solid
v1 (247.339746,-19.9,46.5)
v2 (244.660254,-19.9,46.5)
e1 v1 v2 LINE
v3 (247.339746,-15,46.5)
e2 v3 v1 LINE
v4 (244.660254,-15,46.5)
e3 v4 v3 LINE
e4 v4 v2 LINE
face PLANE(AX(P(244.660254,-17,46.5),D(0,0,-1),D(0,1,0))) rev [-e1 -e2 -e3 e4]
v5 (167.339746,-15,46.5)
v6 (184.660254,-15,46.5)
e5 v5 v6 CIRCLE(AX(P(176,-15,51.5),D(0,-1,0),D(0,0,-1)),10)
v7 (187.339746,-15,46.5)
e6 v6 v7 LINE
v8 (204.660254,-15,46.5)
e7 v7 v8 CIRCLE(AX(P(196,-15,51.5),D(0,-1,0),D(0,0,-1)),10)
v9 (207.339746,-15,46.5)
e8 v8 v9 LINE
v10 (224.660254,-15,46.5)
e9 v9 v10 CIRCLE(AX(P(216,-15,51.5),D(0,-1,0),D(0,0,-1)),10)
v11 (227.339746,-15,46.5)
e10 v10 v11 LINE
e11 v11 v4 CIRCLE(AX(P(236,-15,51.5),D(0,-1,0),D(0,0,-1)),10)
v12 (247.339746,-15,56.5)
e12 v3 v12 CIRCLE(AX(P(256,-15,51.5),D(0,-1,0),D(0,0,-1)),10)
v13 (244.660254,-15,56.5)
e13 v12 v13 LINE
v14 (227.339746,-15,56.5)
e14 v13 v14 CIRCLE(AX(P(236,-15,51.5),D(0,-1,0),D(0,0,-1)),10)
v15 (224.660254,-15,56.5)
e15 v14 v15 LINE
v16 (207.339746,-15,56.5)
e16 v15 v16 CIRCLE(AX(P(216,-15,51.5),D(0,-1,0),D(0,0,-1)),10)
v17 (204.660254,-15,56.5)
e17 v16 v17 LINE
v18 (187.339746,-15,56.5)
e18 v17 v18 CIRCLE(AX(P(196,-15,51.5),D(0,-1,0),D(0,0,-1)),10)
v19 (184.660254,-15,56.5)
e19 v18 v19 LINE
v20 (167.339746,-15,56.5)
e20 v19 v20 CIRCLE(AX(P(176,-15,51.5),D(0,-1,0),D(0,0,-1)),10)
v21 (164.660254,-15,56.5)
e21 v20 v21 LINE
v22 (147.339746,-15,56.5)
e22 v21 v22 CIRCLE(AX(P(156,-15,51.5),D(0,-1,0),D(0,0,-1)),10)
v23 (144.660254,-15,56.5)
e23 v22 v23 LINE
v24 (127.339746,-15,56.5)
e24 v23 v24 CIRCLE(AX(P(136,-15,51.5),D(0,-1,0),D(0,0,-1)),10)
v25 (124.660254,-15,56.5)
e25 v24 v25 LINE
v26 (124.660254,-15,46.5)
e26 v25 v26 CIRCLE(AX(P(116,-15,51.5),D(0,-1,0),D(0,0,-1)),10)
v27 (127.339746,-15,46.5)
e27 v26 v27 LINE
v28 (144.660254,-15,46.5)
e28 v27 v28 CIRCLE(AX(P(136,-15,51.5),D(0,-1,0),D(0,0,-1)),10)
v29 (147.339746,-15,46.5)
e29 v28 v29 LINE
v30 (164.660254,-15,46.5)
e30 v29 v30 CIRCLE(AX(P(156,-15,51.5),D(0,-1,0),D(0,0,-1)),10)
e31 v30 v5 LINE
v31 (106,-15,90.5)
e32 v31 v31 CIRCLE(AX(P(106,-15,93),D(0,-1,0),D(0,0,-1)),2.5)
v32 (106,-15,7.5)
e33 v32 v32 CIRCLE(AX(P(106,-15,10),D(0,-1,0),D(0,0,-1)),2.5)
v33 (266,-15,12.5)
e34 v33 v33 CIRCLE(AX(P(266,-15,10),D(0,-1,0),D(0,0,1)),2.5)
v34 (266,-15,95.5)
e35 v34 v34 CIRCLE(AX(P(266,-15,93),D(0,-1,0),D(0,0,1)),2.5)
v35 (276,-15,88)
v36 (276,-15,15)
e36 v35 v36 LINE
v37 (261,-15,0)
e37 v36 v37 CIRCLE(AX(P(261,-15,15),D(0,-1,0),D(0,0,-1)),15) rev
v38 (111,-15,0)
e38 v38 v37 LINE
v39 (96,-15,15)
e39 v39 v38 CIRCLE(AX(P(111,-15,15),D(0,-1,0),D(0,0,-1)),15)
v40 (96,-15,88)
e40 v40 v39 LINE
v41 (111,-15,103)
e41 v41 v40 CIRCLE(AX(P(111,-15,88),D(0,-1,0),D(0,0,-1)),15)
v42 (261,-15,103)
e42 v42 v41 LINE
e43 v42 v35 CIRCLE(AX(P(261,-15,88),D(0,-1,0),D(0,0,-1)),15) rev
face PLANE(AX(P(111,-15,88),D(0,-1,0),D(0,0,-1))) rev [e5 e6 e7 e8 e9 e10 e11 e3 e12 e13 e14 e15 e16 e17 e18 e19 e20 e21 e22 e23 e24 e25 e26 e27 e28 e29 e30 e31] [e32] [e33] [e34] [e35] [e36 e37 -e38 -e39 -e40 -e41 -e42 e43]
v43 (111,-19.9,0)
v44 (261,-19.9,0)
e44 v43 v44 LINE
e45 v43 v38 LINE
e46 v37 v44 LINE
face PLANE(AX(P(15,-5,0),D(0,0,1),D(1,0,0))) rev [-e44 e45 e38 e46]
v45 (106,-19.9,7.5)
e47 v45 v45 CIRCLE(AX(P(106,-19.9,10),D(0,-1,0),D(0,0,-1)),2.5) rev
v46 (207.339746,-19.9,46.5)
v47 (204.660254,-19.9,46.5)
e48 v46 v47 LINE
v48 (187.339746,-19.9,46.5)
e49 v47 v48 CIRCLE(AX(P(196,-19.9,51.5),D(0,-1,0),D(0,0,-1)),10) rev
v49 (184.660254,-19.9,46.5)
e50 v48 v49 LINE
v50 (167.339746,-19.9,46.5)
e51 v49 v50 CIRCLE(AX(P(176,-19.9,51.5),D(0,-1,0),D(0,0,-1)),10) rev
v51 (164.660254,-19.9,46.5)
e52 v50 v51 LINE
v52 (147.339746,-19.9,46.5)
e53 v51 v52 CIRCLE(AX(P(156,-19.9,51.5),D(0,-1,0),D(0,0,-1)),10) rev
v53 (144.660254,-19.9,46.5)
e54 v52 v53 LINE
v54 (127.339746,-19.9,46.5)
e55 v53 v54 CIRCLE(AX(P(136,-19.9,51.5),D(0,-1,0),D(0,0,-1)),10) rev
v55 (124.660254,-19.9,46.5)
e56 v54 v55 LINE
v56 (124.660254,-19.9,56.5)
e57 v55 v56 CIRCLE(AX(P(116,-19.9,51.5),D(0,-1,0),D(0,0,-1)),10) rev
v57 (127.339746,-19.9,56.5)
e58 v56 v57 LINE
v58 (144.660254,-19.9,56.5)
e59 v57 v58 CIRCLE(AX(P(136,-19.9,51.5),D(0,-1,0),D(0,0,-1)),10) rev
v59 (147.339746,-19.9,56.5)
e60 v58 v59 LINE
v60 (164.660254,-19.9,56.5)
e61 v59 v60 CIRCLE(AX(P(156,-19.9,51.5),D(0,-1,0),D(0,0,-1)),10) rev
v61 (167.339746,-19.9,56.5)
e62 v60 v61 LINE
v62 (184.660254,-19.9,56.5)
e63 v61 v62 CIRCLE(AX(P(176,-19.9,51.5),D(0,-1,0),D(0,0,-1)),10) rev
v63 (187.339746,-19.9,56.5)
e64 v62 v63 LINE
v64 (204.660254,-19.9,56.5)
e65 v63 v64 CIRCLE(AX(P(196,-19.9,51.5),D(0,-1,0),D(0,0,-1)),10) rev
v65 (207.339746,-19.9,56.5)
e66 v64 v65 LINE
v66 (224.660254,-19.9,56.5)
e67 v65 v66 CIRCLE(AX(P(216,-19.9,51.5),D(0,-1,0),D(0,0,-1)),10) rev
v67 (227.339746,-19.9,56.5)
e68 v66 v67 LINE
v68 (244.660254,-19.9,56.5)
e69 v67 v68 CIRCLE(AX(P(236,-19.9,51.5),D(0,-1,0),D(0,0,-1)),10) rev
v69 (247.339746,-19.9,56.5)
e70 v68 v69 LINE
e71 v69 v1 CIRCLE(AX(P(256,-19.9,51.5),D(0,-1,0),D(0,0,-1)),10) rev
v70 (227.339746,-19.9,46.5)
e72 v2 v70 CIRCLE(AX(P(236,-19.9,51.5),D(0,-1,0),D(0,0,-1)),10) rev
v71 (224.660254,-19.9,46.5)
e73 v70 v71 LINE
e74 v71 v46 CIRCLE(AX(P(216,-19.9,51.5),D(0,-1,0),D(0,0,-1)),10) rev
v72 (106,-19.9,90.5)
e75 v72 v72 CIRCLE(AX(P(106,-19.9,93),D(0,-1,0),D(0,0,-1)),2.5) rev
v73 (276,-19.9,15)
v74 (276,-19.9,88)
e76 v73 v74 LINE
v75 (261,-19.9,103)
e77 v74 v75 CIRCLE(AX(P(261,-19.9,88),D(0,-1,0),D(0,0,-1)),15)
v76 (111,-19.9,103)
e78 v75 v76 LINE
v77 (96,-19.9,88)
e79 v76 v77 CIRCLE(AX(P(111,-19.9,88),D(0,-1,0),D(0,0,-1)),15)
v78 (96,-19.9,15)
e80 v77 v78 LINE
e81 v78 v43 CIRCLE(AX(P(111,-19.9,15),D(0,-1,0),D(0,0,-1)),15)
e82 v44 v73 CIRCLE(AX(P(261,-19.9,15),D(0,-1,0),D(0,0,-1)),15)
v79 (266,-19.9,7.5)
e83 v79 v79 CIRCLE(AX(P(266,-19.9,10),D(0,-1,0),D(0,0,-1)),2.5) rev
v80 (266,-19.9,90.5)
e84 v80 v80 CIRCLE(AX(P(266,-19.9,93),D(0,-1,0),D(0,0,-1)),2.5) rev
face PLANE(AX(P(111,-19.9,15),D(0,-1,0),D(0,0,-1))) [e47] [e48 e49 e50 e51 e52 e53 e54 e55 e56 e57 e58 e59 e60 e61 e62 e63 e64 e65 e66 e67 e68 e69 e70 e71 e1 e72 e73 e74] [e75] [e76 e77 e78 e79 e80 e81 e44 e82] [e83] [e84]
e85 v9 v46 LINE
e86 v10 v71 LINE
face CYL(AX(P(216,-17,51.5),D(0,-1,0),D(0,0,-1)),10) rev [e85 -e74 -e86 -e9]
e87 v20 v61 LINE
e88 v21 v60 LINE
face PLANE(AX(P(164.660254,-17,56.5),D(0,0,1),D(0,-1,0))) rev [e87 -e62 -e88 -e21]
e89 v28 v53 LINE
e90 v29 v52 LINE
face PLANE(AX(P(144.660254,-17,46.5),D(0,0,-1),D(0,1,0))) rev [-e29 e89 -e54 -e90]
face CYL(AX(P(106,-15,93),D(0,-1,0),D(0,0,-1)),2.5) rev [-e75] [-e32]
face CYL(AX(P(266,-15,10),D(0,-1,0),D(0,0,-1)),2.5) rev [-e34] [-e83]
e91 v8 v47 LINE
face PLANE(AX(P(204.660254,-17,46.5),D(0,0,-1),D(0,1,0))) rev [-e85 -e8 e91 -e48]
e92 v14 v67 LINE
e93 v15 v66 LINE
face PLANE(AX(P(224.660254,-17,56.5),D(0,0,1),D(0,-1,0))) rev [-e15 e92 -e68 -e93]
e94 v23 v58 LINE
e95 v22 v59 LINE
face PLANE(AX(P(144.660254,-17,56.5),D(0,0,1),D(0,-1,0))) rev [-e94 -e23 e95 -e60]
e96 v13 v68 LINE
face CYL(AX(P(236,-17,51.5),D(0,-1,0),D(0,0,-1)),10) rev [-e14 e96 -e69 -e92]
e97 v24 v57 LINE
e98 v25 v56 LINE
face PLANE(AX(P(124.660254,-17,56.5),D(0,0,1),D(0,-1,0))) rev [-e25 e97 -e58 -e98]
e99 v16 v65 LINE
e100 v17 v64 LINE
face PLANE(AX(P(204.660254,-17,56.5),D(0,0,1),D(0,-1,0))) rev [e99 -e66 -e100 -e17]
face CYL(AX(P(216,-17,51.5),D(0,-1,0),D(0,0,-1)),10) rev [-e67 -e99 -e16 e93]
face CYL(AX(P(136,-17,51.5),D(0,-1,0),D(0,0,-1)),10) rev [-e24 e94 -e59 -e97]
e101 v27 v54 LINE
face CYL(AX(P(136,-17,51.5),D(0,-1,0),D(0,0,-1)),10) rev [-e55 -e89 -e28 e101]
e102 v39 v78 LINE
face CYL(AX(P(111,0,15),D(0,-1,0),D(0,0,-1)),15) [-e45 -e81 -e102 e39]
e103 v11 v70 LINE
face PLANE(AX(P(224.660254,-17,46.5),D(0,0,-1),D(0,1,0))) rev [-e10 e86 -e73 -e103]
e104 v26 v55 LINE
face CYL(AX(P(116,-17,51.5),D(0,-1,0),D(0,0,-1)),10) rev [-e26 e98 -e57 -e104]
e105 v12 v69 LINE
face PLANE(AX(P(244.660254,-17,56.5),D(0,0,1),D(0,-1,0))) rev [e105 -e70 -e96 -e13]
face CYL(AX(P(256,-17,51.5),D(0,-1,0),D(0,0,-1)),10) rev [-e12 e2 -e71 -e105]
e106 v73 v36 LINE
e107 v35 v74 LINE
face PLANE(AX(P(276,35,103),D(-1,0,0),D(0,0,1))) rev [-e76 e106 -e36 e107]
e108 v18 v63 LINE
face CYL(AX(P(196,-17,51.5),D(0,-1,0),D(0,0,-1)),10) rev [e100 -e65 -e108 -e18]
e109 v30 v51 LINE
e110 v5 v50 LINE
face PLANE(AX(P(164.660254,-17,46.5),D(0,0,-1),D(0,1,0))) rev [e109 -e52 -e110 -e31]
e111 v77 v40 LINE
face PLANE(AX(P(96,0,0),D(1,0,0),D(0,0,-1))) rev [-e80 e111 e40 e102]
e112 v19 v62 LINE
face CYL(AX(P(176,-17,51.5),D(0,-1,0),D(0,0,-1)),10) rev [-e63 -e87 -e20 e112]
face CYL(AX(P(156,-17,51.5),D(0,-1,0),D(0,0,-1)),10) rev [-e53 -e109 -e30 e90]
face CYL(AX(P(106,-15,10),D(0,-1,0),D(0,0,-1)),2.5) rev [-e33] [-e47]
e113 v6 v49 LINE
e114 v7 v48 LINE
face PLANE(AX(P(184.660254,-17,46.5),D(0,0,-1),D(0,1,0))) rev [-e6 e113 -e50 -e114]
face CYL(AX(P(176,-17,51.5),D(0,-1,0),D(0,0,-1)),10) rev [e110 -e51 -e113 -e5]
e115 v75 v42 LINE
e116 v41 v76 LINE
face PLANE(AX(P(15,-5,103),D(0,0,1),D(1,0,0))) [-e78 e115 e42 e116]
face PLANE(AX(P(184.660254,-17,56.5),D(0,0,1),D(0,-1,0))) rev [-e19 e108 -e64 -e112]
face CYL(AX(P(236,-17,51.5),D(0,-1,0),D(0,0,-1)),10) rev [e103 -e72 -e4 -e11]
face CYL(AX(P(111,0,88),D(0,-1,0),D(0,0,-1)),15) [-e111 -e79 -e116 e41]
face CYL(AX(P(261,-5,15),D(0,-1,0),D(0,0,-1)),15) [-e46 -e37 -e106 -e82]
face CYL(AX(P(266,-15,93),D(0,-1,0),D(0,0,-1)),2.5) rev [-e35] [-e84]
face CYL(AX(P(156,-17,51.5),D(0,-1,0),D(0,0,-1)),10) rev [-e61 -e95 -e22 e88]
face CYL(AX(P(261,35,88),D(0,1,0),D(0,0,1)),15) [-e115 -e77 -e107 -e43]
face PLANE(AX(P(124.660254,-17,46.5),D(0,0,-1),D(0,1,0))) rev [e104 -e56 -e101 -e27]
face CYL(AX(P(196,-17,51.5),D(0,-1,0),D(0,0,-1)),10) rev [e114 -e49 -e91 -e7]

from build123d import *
from build123d.topology import SkipClean

# Parameters (mm, degrees)
SALIENTE_EXTRUIR1_DEPTH     = 103
CROQUIS2_W                  = 5
CROQUIS2_H                  = 50
CROQUIS2_H_2                = 80
SALIENTE_EXTRUIR2_DEPTH     = 35
REDONDEO1_R                 = 5
REDONDEO2_R                 = 5
SALIENTE_EXTRUIR3_DEPTH     = 322
REDONDEO4_R                 = 10
REDONDEO5_R                 = 10
CORTAR_EXTRUIR1_DEPTH       = 384.597445247
CORTAR_EXTRUIR1_DEPTH_BACK  = 384.597445247
CROQUIS4_W                  = 120
CROQUIS4_H                  = 165.437368142
CROQUIS8_W                  = 103
CROQUIS8_H                  = 7
SALIENTE_EXTRUIR5_DEPTH     = 200
REDONDEO6_R                 = 15
CROQUIS10_R                 = 2.5
CORTAR_EXTRUIR5_DEPTH       = 289.46836915
CORTAR_EXTRUIR6_DEPTH       = 10
SALIENTE_EXTRUIR6_DEPTH     = 12
CROQUIS12_W                 = 103
CROQUIS12_H                 = 5
SALIENTE_EXTRUIR7_DEPTH     = 41
REDONDEO7_R                 = 10
CORTAR_EXTRUIR7_DEPTH       = 384.597445247
CORTAR_EXTRUIR7_DEPTH_BACK  = 384.597445247
CROQUIS13_W                 = 211.982826688
CROQUIS13_H                 = 7
REDONDEO8_R                 = 5
CORTAR_EXTRUIR9_DEPTH       = 386.127251697
CORTAR_EXTRUIR9_DEPTH_BACK  = 386.127251697
CROQUIS14_W                 = 102.672801221
CROQUIS14_H                 = 112.094986942
REDONDEO9_R                 = 15
CORTAR_EXTRUIR10_DEPTH      = 295.63536787
CORTAR_EXTRUIR10_DEPTH_BACK = 295.63536787
CROQUIS15_R                 = 2.5
CORTAR_EXTRUIR11_DEPTH      = 0.1


# Some blends are built 0.0001 mm under size
with BuildPart() as part:
    # Croquis1 → Saliente-Extruir1 (new body)
    with BuildSketch(Plane.XY):
        with BuildLine():
            Line((0, 0), (0, -5))
            ThreePointArc((0, -5), (4.393398282, -15.606601718), (15, -20))
            Line((15, -20), (337, -20))
            ThreePointArc((337, -20), (347.606601718, -15.606601718), (352, -5))
            Line((352, -5), (352, 0))
            Line((352, 0), (367, 0))
            Line((367, 0), (367, -5))
            ThreePointArc((367, -5), (358.213203436, -26.213203436), (337, -35))
            Line((337, -35), (15, -35))
            ThreePointArc((15, -35), (-6.213203436, -26.213203436), (-15, -5))
            Line((-15, -5), (-15, 0))
            Line((-15, 0), (0, 0))
        make_face()
    extrude(amount=SALIENTE_EXTRUIR1_DEPTH)

    # Croquis2 → Saliente-Extruir2 (add)
    with BuildSketch(Plane(origin=(0, 0, 0), x_dir=(1, 0, 0), z_dir=(0, 1, 0))):
        with Locations((-7.5, -50.145888002)):
            Rectangle(CROQUIS2_W, CROQUIS2_H)
        with Locations((359.5, -51.5)):
            Rectangle(CROQUIS2_W, CROQUIS2_H_2)
    extrude(amount=SALIENTE_EXTRUIR2_DEPTH)

    # Redondeo1
    redondeo1_edges = [part.edges().sort_by_distance(p)[0] for p in [
        (-10, 0, 50.145888002),
        (-7.5, 0, 75.145888002),
        (-5, 0, 50.145888002),
        (-7.5, 0, 25.145888002),
        (357, 0, 51.5),
        (359.5, 0, 91.5),
        (362, 0, 51.5),
        (359.5, 0, 11.5),
    ]]
    fillet(redondeo1_edges, radius=REDONDEO1_R - 0.0001)  # a hair under: the kernel refuses the full size

    # Redondeo2
    redondeo2_edges = [part.edges().sort_by_distance(p)[0] for p in [
        (-7.5, 35, 75.145888002),
        (-7.5, 35, 25.145888002),
        (359.5, 35, 91.5),
        (359.5, 35, 11.5),
    ]]
    fillet(redondeo2_edges, radius=REDONDEO2_R)

    # Croquis3 → Saliente-Extruir3 (add)
    with BuildSketch(Plane(origin=(15, 0, 0), x_dir=(0, 0, -1), z_dir=(1, 0, 0))):
        Polygon((-76.5, -35), (-70.5, -35), (-70.5, -37), (-32.5, -37), (-32.5, -35), (-26.5, -35), (-26.5, -43), (-76.5, -43), align=None)
    extrude(amount=SALIENTE_EXTRUIR3_DEPTH)

    # Redondeo4
    # the kernel refuses this fillet: 10 mm, written as the material it adds along each edge
    with BuildSketch(Plane(origin=(15, -35, 76.5), x_dir=(0, 0, 1), z_dir=(1, 0, 0))) as redondeo4_piece_1:
        with BuildLine():
            CenterArc((9.797958971, 10), REDONDEO4_R, 191.536959033, 78.463040967)
            Line((0, 8), (-0.195959179, 7.96))
            ThreePointArc((-0.195959179, 7.96), (-0.2, 4), (-0.2, 0))
            Line((-0.2, 0), (0, -0.2))
            Line((0, -0.2), (9.797958971, -0.2))
            Line((9.797958971, -0.2), (9.797958971, 0))
        make_face()
    extrude(amount=322)
    with BuildSketch(Plane(origin=(15, -35, 26.5), x_dir=(0, 0, -1), z_dir=(1, 0, 0))) as redondeo4_piece_2:
        with BuildLine():
            CenterArc((9.797958971, -10), REDONDEO4_R, 90, 78.463040967)
            Line((0, -8), (-0.195959179, -7.96))
            ThreePointArc((-0.195959179, -7.96), (-0.2, -4), (-0.2, 0))
            Line((-0.2, 0), (0, 0.2))
            Line((0, 0.2), (9.797958971, 0.2))
            Line((9.797958971, 0.2), (9.797958971, 0))
        make_face()
    extrude(amount=322)

    # Redondeo5
    redondeo5_edges = [part.edges().sort_by_distance(p)[0] for p in [
        (176, -43, 76.5),
        (176, -43, 26.5),
    ]]
    fillet(redondeo5_edges, radius=REDONDEO5_R)

    # Croquis4 → Cortar-Extruir1 (cut, two sides: drawn at the far end of the back side and taken through both)
    with BuildSketch(Plane.XY.offset(103).offset(-CORTAR_EXTRUIR1_DEPTH_BACK)):
        with Locations((236, 7.126913707)):
            Rectangle(CROQUIS4_W, CROQUIS4_H)
    extrude(amount=CORTAR_EXTRUIR1_DEPTH + CORTAR_EXTRUIR1_DEPTH_BACK, mode=Mode.SUBTRACT)


with BuildPart() as body_2:
    # of the pieces the cut leaves, the one that is kept (cortar_extruir1_keep)
    add(part.part.solids().sort_by_distance((296, -39, 24.702041029))[0])

    # Croquis8 → Saliente-Extruir5 (add)
    with BuildSketch(Plane.ZY.offset(-296)):
        with Locations((51.5, -23.5)):
            Rectangle(CROQUIS8_W, CROQUIS8_H)
    extrude(amount=SALIENTE_EXTRUIR5_DEPTH)

    # Redondeo6
    redondeo6_edges = [body_2.edges().sort_by_distance(p)[0] for p in [
        (96, -23.5, 103),
        (96, -23.5, 0),
    ]]
    fillet(redondeo6_edges, radius=REDONDEO6_R)

    # Croquis10 → Cortar-Extruir5 (cut, through all)
    with BuildSketch(Plane(origin=(362, 0, 0), x_dir=(0, 0, -1), z_dir=(1, 0, 0))):
        with Locations(Location((-80.5, 20, 0), (0, 0, 90))):
            Circle(CROQUIS10_R)
        with Locations(Location((-22.5, 20, 0), (0, 0, 90))):
            Circle(CROQUIS10_R)
    extrude(amount=-CORTAR_EXTRUIR5_DEPTH, mode=Mode.SUBTRACT)

    # Croquis9 → Cortar-Extruir6 (cut)
    with BuildSketch(Plane.XZ.offset(27)):
        with BuildLine():
            Line((144.660254038, 56.5), (147.339745962, 56.5))
            ThreePointArc((147.339745962, 56.5), (156, 61.5), (164.660254038, 56.5))
            Line((164.660254038, 56.5), (167.339745962, 56.5))
            ThreePointArc((167.339745962, 56.5), (176, 61.5), (184.660254038, 56.5))
            Line((184.660254038, 56.5), (187.339745962, 56.5))
            ThreePointArc((187.339745962, 56.5), (196, 61.5), (204.660254038, 56.5))
            Line((204.660254038, 56.5), (207.339745962, 56.5))
            ThreePointArc((207.339745962, 56.5), (216, 61.5), (224.660254038, 56.5))
            Line((224.660254038, 56.5), (227.339745962, 56.5))
            ThreePointArc((227.339745962, 56.5), (236, 61.5), (244.660254038, 56.5))
            Line((244.660254038, 56.5), (247.339745962, 56.5))
            ThreePointArc((247.339745962, 56.5), (266, 51.5), (247.339745962, 46.5))
            Line((247.339745962, 46.5), (244.660254038, 46.5))
            ThreePointArc((244.660254038, 46.5), (236, 41.5), (227.339745962, 46.5))
            Line((227.339745962, 46.5), (224.660254038, 46.5))
            ThreePointArc((224.660254038, 46.5), (216, 41.5), (207.339745962, 46.5))
            Line((207.339745962, 46.5), (204.660254038, 46.5))
            ThreePointArc((204.660254038, 46.5), (196, 41.5), (187.339745962, 46.5))
            Line((187.339745962, 46.5), (184.660254038, 46.5))
            ThreePointArc((184.660254038, 46.5), (176, 41.5), (167.339745962, 46.5))
            Line((167.339745962, 46.5), (164.660254038, 46.5))
            ThreePointArc((164.660254038, 46.5), (156, 41.5), (147.339745962, 46.5))
            Line((147.339745962, 46.5), (144.660254038, 46.5))
            ThreePointArc((144.660254038, 46.5), (136, 41.5), (127.339745962, 46.5))
            Line((127.339745962, 46.5), (124.660254038, 46.5))
            ThreePointArc((124.660254038, 46.5), (106, 51.5), (124.660254038, 56.5))
            Line((124.660254038, 56.5), (127.339745962, 56.5))
            ThreePointArc((127.339745962, 56.5), (136, 61.5), (144.660254038, 56.5))
        make_face()
    extrude(amount=-CORTAR_EXTRUIR6_DEPTH, mode=Mode.SUBTRACT)

    # Croquis11 → Saliente-Extruir6 (add)
    with BuildSketch(Plane.XZ.offset(27)):
        with BuildLine():
            Line((96, 88), (96, 15))
            ThreePointArc((96, 15), (100.393398282, 4.393398282), (111, 0))
            Line((111, 0), (296, 0))
            Line((296, 0), (296, 103))
            Line((296, 103), (111, 103))
            ThreePointArc((111, 103), (100.393398282, 98.606601718), (96, 88))
        make_face()
        with BuildLine():
            Line((247.339745962, 56.5), (244.660254038, 56.5))
            ThreePointArc((244.660254038, 56.5), (236, 61.5), (227.339745962, 56.5))
            Line((227.339745962, 56.5), (224.660254038, 56.5))
            ThreePointArc((224.660254038, 56.5), (216, 61.5), (207.339745962, 56.5))
            Line((207.339745962, 56.5), (204.660254038, 56.5))
            ThreePointArc((204.660254038, 56.5), (196, 61.5), (187.339745962, 56.5))
            Line((187.339745962, 56.5), (184.660254038, 56.5))
            ThreePointArc((184.660254038, 56.5), (176, 61.5), (167.339745962, 56.5))
            Line((167.339745962, 56.5), (164.660254038, 56.5))
            ThreePointArc((164.660254038, 56.5), (156, 61.5), (147.339745962, 56.5))
            Line((147.339745962, 56.5), (144.660254038, 56.5))
            ThreePointArc((144.660254038, 56.5), (136, 61.5), (127.339745962, 56.5))
            Line((127.339745962, 56.5), (124.660254038, 56.5))
            ThreePointArc((124.660254038, 56.5), (106, 51.5), (124.660254038, 46.5))
            Line((124.660254038, 46.5), (127.339745962, 46.5))
            ThreePointArc((127.339745962, 46.5), (136, 41.5), (144.660254038, 46.5))
            Line((144.660254038, 46.5), (147.339745962, 46.5))
            ThreePointArc((147.339745962, 46.5), (156, 41.5), (164.660254038, 46.5))
            Line((164.660254038, 46.5), (167.339745962, 46.5))
            ThreePointArc((167.339745962, 46.5), (176, 41.5), (184.660254038, 46.5))
            Line((184.660254038, 46.5), (187.339745962, 46.5))
            ThreePointArc((187.339745962, 46.5), (196, 41.5), (204.660254038, 46.5))
            Line((204.660254038, 46.5), (207.339745962, 46.5))
            ThreePointArc((207.339745962, 46.5), (216, 41.5), (224.660254038, 46.5))
            Line((224.660254038, 46.5), (227.339745962, 46.5))
            ThreePointArc((227.339745962, 46.5), (236, 41.5), (244.660254038, 46.5))
            Line((244.660254038, 46.5), (247.339745962, 46.5))
            ThreePointArc((247.339745962, 46.5), (266, 51.5), (247.339745962, 56.5))
        make_face(mode=Mode.SUBTRACT)
    extrude(amount=-SALIENTE_EXTRUIR6_DEPTH)

    # Croquis12 → Saliente-Extruir7 (add)
    with SkipClean():  # the faces are left unmerged after this step: merging them gives an invalid solid
        with BuildSketch(Plane(origin=(296, 0, 0), x_dir=(0, 0, -1), z_dir=(1, 0, 0))):
            with Locations((-51.5, -17.5)):
                Rectangle(CROQUIS12_W, CROQUIS12_H)
        extrude(amount=SALIENTE_EXTRUIR7_DEPTH)
    add(body_2.part.scale(1), mode=Mode.REPLACE)  # the faces are merged on a copy

    # Redondeo7
    # the kernel refuses this fillet: 10 mm, written as the material it takes off along each edge
    with BuildSketch(Plane(origin=(337, -15, -21.650635095), x_dir=(0, -1, 0), z_dir=(0, 0, 1))) as redondeo7_piece_1:
        with BuildLine():
            CenterArc((10, -8.660254038), REDONDEO7_R, 120, 60)
            Line((0, -8.660254038), (-0.2, -8.660254038))
            Line((-0.2, -8.660254038), (-0.2, 0))
            Line((-0.2, 0), (0, 0.2))
            ThreePointArc((0, 0.2), (2.5, 0.2), (4.9, 0.173205081))
            Line((4.9, 0.173205081), (5, 0))
        make_face()
    extrude(amount=146.301270189, mode=Mode.SUBTRACT)

    # Croquis13 → Cortar-Extruir7 (cut, two sides: drawn at the far end of the back side and taken through both)
    with BuildSketch(Plane.XY.offset(103).offset(-CORTAR_EXTRUIR7_DEPTH_BACK)):
        with Locations((190.008586656, -23.5)):
            Rectangle(CROQUIS13_W, CROQUIS13_H)
    extrude(amount=CORTAR_EXTRUIR7_DEPTH + CORTAR_EXTRUIR7_DEPTH_BACK, mode=Mode.SUBTRACT)

    # Redondeo8
    redondeo8_edges = [body_2.edges().sort_by_distance(p)[0] for p in [
        (296, -20, 51.5),
    ]]
    fillet(redondeo8_edges, radius=REDONDEO8_R)

    # Croquis14 → Cortar-Extruir9 (cut, two sides: drawn at the far end of the back side and taken through both)
    with BuildSketch(Plane.XZ.offset(20).offset(-CORTAR_EXTRUIR9_DEPTH_BACK)):
        with Locations((327.336400611, 46.952506529)):
            Rectangle(CROQUIS14_W, CROQUIS14_H)
    extrude(amount=CORTAR_EXTRUIR9_DEPTH + CORTAR_EXTRUIR9_DEPTH_BACK, mode=Mode.SUBTRACT)

    # Redondeo9
    redondeo9_edges = [body_2.edges().sort_by_distance(p)[0] for p in [
        (276, -17.5, 0),
        (276, -17.5, 103),
    ]]
    fillet(redondeo9_edges, radius=REDONDEO9_R)

    # Croquis15 → Cortar-Extruir10 (cut, two sides: drawn at the far end of the back side and taken through both)
    with BuildSketch(Plane.XZ.offset(20).offset(-CORTAR_EXTRUIR10_DEPTH_BACK)):
        with Locations(Location((106, 93, 0), (0, 0, 270))):
            Circle(CROQUIS15_R)
        with Locations(Location((106, 10, 0), (0, 0, 270))):
            Circle(CROQUIS15_R)
        with Locations(Location((266, 10, 0), (0, 0, 90))):
            Circle(CROQUIS15_R)
        with Locations(Location((266, 93, 0), (0, 0, 90))):
            Circle(CROQUIS15_R)
    extrude(amount=CORTAR_EXTRUIR10_DEPTH + CORTAR_EXTRUIR10_DEPTH_BACK, mode=Mode.SUBTRACT)

    # Croquis16 → Cortar-Extruir11 (cut)
    with BuildSketch(Plane.XZ.offset(20)):
        with BuildLine():
            Line((111, 0), (261, 0))
            ThreePointArc((261, 0), (271.606601718, 4.393398282), (276, 15))
            Line((276, 15), (276, 88))
            ThreePointArc((276, 88), (271.606601718, 98.606601718), (261, 103))
            Line((261, 103), (111, 103))
            ThreePointArc((111, 103), (100.393398282, 98.606601718), (96, 88))
            Line((96, 88), (96, 15))
            ThreePointArc((96, 15), (100.393398282, 4.393398282), (111, 0))
        make_face()
    extrude(amount=-CORTAR_EXTRUIR11_DEPTH, mode=Mode.SUBTRACT)


solid = body_2.part
